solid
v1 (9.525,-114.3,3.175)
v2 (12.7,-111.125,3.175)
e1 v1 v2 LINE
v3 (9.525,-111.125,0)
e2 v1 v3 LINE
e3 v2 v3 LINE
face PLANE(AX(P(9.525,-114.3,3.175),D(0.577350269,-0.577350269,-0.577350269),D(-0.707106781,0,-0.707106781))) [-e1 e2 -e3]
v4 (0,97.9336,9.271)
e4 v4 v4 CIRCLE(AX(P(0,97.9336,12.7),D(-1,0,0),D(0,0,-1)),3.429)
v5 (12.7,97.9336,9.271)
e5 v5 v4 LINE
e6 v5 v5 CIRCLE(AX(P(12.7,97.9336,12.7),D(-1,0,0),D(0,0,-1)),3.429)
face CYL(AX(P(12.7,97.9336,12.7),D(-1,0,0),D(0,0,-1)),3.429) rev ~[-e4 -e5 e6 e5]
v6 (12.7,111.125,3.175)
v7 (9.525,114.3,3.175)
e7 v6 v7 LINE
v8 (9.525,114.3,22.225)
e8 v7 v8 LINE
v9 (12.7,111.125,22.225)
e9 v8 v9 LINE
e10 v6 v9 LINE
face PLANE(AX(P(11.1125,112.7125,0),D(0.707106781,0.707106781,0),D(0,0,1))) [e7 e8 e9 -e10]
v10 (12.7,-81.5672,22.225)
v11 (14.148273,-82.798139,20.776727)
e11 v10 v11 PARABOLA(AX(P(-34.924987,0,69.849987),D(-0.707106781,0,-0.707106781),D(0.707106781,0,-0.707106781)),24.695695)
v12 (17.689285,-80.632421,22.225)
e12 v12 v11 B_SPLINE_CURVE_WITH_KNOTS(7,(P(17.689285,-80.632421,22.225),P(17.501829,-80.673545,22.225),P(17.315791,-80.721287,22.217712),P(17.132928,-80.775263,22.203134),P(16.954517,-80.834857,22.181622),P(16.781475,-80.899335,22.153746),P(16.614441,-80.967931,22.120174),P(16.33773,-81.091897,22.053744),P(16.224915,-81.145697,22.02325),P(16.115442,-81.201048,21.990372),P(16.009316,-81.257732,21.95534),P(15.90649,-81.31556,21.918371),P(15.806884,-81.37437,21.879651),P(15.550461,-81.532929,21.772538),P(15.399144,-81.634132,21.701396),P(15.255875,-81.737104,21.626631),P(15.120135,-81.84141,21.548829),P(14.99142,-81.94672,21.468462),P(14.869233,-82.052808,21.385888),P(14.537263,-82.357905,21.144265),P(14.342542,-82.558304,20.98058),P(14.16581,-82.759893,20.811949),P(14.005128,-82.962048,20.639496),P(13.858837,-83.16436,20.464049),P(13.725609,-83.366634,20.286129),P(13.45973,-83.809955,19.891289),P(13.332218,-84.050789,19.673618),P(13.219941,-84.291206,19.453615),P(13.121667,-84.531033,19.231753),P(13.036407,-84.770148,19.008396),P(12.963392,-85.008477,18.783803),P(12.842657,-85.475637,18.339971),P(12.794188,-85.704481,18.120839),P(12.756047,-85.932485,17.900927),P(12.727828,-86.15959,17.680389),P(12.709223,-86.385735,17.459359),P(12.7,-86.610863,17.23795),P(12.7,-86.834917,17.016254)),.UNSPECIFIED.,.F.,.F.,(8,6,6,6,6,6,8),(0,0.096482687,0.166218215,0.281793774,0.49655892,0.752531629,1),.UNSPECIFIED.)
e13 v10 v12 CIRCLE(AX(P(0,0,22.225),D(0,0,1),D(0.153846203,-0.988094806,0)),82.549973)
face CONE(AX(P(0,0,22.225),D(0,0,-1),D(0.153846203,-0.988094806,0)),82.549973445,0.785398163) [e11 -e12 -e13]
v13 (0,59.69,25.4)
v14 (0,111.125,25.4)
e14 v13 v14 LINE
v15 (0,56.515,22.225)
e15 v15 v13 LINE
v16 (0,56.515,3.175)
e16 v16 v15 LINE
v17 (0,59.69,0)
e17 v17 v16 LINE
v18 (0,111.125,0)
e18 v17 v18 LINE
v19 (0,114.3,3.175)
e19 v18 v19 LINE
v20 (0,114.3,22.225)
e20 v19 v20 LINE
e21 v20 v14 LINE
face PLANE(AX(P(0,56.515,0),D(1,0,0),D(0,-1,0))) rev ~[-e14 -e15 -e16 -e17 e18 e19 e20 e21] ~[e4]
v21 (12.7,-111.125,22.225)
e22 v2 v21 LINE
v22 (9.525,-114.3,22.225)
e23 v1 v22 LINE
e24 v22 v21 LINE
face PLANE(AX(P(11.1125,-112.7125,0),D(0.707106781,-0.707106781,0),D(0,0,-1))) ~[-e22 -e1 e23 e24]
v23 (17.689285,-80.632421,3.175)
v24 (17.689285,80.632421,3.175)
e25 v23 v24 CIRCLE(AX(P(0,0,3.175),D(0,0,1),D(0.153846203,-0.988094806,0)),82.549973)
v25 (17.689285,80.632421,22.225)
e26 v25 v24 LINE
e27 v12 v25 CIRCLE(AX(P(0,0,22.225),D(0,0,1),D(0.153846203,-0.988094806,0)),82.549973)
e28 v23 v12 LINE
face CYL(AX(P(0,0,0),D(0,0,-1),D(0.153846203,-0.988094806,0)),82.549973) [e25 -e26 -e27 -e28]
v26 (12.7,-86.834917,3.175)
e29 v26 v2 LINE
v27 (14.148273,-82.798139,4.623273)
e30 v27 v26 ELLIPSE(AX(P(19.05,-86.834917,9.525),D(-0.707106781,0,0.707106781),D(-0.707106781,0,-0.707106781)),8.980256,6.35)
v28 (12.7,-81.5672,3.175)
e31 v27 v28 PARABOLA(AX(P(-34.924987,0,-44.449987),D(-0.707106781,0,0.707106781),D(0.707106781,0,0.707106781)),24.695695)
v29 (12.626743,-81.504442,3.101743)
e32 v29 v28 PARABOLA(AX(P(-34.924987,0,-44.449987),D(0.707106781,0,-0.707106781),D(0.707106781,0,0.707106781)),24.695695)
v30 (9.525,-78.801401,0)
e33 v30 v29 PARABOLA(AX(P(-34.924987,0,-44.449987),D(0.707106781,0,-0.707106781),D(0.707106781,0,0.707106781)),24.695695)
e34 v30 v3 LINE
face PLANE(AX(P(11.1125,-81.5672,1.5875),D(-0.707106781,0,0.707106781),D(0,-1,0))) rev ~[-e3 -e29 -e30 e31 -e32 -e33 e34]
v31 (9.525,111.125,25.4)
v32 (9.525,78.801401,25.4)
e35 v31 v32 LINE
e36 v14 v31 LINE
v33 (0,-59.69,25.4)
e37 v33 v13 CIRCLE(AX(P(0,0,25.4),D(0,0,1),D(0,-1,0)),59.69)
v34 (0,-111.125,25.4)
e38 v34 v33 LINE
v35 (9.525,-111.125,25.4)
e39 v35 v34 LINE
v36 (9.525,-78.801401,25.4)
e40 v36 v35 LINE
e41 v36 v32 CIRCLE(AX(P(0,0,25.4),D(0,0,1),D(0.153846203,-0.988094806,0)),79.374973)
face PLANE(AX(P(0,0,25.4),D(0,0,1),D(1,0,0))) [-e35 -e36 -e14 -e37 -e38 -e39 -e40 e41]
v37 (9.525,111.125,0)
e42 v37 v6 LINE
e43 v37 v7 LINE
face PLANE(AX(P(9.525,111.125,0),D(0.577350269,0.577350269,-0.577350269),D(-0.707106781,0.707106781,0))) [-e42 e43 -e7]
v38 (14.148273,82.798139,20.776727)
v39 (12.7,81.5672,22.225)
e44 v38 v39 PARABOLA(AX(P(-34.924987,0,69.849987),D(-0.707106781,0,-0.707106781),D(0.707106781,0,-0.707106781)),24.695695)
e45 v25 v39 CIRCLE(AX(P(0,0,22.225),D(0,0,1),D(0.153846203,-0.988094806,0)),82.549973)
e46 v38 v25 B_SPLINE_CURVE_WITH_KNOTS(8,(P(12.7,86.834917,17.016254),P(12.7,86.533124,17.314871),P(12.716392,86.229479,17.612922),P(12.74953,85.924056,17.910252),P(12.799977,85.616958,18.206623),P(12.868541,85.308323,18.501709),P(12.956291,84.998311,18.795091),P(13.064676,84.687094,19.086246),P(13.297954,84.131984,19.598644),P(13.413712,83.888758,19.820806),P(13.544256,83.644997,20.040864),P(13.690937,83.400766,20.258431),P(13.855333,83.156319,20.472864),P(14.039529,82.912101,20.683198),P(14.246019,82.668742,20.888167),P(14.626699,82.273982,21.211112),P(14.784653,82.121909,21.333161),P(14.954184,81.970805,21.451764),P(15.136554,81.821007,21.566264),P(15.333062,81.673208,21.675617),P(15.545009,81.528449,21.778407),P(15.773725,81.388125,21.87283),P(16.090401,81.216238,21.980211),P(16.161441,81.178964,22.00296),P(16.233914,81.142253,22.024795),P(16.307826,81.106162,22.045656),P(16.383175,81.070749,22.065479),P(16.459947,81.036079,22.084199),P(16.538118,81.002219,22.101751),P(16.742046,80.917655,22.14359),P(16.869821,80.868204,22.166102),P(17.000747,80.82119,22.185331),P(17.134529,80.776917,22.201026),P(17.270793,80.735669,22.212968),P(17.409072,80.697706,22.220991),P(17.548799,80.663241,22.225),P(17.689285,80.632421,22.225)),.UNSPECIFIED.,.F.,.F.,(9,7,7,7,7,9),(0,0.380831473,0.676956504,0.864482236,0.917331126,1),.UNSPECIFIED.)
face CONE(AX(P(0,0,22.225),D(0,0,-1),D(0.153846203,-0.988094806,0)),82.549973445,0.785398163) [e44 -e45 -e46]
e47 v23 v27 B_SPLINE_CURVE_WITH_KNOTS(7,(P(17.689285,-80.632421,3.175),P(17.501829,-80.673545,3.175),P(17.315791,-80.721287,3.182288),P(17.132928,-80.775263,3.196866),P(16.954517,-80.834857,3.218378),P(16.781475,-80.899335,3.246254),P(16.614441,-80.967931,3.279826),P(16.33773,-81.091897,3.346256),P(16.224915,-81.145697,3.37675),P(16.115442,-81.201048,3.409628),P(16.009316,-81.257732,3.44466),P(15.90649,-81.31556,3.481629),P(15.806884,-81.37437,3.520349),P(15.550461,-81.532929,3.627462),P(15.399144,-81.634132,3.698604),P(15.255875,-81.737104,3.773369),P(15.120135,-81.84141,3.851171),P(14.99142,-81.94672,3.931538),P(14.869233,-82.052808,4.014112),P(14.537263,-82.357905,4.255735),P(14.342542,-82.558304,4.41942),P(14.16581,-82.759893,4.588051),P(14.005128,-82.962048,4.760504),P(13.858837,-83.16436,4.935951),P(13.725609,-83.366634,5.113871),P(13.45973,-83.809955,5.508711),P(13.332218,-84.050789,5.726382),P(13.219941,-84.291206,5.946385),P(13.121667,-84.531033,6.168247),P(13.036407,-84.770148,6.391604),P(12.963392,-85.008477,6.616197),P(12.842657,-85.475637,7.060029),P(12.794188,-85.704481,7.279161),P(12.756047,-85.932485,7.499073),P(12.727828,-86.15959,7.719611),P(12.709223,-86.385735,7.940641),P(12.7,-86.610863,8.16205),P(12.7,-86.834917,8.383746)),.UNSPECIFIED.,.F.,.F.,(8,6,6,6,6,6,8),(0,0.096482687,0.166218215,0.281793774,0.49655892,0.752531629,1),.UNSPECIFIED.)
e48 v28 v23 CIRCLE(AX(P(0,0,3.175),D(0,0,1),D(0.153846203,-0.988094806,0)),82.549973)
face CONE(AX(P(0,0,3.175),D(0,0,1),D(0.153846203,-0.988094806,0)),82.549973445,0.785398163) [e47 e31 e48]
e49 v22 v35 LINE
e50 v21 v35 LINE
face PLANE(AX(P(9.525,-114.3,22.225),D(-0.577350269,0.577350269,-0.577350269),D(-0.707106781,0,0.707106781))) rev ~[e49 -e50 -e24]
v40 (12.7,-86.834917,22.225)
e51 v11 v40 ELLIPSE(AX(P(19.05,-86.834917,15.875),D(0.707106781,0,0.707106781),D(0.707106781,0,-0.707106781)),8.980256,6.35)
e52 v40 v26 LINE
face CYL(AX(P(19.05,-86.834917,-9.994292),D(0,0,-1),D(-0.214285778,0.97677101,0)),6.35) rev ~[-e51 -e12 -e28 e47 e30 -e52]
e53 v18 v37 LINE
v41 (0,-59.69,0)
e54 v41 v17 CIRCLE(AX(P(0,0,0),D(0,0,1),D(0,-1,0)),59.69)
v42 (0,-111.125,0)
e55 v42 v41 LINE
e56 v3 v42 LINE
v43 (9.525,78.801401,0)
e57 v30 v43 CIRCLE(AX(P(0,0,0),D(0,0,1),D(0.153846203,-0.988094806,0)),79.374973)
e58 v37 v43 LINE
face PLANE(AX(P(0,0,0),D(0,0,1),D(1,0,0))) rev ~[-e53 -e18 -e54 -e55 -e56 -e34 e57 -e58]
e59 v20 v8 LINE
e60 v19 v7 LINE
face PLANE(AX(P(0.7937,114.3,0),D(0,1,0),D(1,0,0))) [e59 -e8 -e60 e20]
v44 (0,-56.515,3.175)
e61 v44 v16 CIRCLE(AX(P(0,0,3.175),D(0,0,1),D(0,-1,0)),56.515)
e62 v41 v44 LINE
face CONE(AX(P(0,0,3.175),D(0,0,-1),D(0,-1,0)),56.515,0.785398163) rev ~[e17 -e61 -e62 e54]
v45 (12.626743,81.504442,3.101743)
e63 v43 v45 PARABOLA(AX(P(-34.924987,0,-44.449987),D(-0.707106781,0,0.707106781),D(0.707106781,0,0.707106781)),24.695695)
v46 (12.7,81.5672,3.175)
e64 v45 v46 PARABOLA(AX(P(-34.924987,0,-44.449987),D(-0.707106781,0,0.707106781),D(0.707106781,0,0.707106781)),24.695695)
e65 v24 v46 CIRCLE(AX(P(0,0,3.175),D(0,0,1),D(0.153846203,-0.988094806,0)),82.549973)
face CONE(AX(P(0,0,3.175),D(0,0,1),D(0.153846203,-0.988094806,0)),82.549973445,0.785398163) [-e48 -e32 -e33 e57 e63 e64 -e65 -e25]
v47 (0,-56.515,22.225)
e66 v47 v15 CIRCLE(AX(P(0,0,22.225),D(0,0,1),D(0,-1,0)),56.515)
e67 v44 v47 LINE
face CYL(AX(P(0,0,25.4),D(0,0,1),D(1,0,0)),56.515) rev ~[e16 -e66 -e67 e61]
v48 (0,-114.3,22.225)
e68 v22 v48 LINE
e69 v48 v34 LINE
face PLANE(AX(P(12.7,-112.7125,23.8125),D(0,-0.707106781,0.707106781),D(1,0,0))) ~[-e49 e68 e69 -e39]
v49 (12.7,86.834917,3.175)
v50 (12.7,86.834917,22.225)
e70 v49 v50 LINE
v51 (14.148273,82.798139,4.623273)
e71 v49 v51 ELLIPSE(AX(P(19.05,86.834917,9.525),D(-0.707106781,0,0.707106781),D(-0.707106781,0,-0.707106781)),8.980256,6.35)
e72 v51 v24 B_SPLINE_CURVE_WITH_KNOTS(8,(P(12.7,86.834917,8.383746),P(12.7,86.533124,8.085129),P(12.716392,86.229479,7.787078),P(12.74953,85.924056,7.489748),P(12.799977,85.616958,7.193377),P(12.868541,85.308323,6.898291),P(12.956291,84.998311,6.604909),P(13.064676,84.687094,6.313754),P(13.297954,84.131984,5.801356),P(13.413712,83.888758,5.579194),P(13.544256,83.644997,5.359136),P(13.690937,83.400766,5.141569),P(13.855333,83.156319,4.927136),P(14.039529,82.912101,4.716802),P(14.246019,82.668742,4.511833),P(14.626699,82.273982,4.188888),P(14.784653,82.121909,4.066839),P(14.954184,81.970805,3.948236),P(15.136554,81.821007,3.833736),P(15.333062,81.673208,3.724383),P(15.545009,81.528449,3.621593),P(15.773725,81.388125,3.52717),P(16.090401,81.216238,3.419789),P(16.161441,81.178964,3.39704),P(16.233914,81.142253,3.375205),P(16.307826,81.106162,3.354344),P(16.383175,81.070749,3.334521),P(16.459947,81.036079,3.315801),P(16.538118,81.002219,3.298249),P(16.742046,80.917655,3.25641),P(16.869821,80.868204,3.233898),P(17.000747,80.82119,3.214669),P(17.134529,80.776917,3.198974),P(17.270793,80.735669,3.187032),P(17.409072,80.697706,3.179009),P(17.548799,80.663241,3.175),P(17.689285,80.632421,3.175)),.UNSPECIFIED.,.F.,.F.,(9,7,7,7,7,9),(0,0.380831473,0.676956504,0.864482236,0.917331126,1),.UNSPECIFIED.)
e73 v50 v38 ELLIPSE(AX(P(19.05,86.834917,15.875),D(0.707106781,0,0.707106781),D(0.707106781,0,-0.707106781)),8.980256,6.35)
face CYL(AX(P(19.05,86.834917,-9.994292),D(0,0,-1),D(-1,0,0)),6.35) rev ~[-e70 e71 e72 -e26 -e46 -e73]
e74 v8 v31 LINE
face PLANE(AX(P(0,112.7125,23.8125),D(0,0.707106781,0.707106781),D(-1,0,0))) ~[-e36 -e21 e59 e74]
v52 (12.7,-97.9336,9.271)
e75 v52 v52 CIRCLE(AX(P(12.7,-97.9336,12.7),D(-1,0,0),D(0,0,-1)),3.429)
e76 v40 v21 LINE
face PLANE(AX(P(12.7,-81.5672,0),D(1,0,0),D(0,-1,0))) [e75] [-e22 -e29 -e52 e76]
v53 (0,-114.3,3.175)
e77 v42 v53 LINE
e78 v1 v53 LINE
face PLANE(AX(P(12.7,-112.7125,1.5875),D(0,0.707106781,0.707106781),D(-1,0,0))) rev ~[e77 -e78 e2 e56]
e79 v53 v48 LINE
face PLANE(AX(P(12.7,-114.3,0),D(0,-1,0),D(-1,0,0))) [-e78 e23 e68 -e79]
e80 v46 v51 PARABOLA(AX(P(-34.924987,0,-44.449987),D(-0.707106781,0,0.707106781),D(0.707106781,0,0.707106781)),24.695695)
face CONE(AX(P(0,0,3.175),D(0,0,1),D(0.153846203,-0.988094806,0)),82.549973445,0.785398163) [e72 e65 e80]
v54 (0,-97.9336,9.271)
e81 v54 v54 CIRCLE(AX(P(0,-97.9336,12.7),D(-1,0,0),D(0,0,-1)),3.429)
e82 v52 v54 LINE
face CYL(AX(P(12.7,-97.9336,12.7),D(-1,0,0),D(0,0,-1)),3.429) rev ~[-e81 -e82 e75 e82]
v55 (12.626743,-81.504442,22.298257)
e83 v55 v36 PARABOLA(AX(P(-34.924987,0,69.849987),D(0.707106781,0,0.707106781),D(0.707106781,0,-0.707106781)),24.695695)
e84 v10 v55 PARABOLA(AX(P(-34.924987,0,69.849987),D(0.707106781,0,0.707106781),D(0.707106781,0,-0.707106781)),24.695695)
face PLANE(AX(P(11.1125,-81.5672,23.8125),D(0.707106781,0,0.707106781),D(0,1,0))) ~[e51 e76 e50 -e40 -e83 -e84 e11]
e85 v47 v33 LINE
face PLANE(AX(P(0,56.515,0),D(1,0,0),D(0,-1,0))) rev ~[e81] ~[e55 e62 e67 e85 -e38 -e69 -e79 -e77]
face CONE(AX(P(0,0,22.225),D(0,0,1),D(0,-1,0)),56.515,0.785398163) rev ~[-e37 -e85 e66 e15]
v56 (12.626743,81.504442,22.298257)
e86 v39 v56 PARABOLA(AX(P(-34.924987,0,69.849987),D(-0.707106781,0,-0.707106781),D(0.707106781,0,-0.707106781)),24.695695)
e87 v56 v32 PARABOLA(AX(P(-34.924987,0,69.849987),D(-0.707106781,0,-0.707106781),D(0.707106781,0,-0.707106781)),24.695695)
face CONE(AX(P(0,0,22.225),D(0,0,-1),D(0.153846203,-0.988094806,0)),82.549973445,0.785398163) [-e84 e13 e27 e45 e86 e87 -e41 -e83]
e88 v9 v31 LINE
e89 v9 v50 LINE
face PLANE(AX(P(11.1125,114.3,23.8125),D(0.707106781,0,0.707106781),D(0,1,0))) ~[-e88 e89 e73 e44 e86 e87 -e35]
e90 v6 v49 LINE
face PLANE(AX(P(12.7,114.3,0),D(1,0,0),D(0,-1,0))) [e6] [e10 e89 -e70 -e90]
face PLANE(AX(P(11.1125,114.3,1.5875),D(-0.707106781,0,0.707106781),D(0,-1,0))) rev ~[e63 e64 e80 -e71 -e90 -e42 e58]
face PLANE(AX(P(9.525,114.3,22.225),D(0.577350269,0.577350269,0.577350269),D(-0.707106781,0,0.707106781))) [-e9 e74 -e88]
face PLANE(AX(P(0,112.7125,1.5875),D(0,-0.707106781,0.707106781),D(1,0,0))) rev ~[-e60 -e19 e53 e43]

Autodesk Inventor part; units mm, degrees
ref_plane "YZ Plane" through (0, 0, 0) normal (1, 0, 0) x (0, 1, 0)
ref_plane "XZ Plane" through (0, 0, 0) normal (0, 1, 0) x (-1, 0, 0)
ref_plane "XY Plane" through (0, 0, 0) normal (0, 0, 1) x (1, 0, 0)
sketch "Sketch1" plane through (0, 0, 0) normal (0, 0, 1) x (1, 0, 0)
  circle A0 centre (0, 0) radius 56.515
  line L0 (12.7, -114.3) -> (-12.7, -114.3)
  line L1 (-12.7, 114.3) -> (12.7, 114.3)
  line L2 (12.7, 114.3) -> (-12.7, -114.3) construction
  line L3 (12.7, -114.3) -> (-12.7, 114.3) construction
  line L4 (12.7, -81.5672) -> (12.7, -114.3)
  line L5 (-12.7, -114.3) -> (-12.7, -81.5672)
  line L6 (12.7, 114.3) -> (12.7, 81.5672)
  arc A1 (12.7, -81.5672) -> (12.7, 81.5672) centre (0, 0) ccw
  arc A2 (-12.7, 81.5672) -> (-12.7, -81.5672) centre (0, 0) ccw
  line L7 (-12.7, 81.5672) -> (-12.7, 114.3)
  line L8 (0, 114.3) -> (0, -114.3)
  line L9 (-0.7937, -114.3) -> (0.7937, -114.3)
  line L10 (0.7937, -114.3) -> (0.7937, 114.3)
  line L11 (0.7937, 114.3) -> (-0.7937, 114.3)
  line L12 (-0.7937, 114.3) -> (-0.7937, -114.3)
  line L13 (-0.7937, -114.3) -> (0.7937, 114.3) construction
  line L14 (0.7937, -114.3) -> (-0.7937, 114.3) construction
  dimension "d0" = 113.03
  dimension "d1" = 228.6
  dimension "d2" = 25.4
  dimension "d3" = 82.55
  dimension "d4" = 82.55
  dimension "d5" = 32.7328
  dimension "d6" = 32.7328
  dimension "d7" = 1.5875
extrude "Extrusion1" add sketch "Sketch1" along normal blind 25.4 contours A0 L10 | A0 L10 L1 L6 A1 L4 L0 | L10 A0 L8 | A0 L8 L1 L10 | L10 L0 L8 A0
sketch "Sketch2" plane through (0, 0, 25.4) normal (0, 0, 1) x (1, 0, 0)
  arc A0 (12.7, -81.5672) -> (12.7, 81.5672) centre (0, 0) ccw projected
  circle A1 centre (0, 0) radius 56.515
  dimension "d10" = 113.03
extrude "Extrusion2" cut sketch "Sketch2" against normal blind 25.4
sketch "Sketch3" plane through (12.7, 81.5672, 0) normal (1, 0, 0) x (0, 0, -1)
  line L0 (-25.4, 32.7328) -> (0, 0) construction
  line L1 (0, -138.0822) -> (0, -195.8672) projected
  line L2 (-25.4, -163.1345) -> (0, -195.8672) construction
  point P0 (0, -81.5672)
  point P1 (-12.7, -179.5008)
  point P2 (-12.7, 16.3664)
hole "Hole1" at (12.7, -97.9336, 12.7) at (12.7, 97.9336, 12.7) direction (-1, 0, 0) diameter 6.858 depth 15.6718 tip angle 118 clearance for "Flat Head Machine Screw (82)" size "1/4" standard "Ansi Unified Screw Threads"
chamfer "Chamfer1" distance 3.175 angle 45 14 edges at (56.515, 0, 25.4) (56.515, 0, 0) (82.55, 0, 0) (82.55, 0, 25.4) (12.7, 97.9336, 25.4) (12.7, 114.3, 12.7) (12.7, 97.9336, 0) (12.7, -97.9336, 0) (12.7, -97.9336, 25.4) (12.7, -114.3, 12.7) (6.35, -114.3, 25.4) (6.35, -114.3, 0) (6.35, 114.3, 25.4) (6.35, 114.3, 0)
fillet "Fillet1" radius 6.35 2 edges at (12.7, -81.5672, 12.7) (12.7, 81.5672, 12.7)
equation "\"d4\" = d3"
equation "\"d6\" = d5"
properties part number "2122_Copper Tube Clamp Top_V1" material "ABS Plastic"
